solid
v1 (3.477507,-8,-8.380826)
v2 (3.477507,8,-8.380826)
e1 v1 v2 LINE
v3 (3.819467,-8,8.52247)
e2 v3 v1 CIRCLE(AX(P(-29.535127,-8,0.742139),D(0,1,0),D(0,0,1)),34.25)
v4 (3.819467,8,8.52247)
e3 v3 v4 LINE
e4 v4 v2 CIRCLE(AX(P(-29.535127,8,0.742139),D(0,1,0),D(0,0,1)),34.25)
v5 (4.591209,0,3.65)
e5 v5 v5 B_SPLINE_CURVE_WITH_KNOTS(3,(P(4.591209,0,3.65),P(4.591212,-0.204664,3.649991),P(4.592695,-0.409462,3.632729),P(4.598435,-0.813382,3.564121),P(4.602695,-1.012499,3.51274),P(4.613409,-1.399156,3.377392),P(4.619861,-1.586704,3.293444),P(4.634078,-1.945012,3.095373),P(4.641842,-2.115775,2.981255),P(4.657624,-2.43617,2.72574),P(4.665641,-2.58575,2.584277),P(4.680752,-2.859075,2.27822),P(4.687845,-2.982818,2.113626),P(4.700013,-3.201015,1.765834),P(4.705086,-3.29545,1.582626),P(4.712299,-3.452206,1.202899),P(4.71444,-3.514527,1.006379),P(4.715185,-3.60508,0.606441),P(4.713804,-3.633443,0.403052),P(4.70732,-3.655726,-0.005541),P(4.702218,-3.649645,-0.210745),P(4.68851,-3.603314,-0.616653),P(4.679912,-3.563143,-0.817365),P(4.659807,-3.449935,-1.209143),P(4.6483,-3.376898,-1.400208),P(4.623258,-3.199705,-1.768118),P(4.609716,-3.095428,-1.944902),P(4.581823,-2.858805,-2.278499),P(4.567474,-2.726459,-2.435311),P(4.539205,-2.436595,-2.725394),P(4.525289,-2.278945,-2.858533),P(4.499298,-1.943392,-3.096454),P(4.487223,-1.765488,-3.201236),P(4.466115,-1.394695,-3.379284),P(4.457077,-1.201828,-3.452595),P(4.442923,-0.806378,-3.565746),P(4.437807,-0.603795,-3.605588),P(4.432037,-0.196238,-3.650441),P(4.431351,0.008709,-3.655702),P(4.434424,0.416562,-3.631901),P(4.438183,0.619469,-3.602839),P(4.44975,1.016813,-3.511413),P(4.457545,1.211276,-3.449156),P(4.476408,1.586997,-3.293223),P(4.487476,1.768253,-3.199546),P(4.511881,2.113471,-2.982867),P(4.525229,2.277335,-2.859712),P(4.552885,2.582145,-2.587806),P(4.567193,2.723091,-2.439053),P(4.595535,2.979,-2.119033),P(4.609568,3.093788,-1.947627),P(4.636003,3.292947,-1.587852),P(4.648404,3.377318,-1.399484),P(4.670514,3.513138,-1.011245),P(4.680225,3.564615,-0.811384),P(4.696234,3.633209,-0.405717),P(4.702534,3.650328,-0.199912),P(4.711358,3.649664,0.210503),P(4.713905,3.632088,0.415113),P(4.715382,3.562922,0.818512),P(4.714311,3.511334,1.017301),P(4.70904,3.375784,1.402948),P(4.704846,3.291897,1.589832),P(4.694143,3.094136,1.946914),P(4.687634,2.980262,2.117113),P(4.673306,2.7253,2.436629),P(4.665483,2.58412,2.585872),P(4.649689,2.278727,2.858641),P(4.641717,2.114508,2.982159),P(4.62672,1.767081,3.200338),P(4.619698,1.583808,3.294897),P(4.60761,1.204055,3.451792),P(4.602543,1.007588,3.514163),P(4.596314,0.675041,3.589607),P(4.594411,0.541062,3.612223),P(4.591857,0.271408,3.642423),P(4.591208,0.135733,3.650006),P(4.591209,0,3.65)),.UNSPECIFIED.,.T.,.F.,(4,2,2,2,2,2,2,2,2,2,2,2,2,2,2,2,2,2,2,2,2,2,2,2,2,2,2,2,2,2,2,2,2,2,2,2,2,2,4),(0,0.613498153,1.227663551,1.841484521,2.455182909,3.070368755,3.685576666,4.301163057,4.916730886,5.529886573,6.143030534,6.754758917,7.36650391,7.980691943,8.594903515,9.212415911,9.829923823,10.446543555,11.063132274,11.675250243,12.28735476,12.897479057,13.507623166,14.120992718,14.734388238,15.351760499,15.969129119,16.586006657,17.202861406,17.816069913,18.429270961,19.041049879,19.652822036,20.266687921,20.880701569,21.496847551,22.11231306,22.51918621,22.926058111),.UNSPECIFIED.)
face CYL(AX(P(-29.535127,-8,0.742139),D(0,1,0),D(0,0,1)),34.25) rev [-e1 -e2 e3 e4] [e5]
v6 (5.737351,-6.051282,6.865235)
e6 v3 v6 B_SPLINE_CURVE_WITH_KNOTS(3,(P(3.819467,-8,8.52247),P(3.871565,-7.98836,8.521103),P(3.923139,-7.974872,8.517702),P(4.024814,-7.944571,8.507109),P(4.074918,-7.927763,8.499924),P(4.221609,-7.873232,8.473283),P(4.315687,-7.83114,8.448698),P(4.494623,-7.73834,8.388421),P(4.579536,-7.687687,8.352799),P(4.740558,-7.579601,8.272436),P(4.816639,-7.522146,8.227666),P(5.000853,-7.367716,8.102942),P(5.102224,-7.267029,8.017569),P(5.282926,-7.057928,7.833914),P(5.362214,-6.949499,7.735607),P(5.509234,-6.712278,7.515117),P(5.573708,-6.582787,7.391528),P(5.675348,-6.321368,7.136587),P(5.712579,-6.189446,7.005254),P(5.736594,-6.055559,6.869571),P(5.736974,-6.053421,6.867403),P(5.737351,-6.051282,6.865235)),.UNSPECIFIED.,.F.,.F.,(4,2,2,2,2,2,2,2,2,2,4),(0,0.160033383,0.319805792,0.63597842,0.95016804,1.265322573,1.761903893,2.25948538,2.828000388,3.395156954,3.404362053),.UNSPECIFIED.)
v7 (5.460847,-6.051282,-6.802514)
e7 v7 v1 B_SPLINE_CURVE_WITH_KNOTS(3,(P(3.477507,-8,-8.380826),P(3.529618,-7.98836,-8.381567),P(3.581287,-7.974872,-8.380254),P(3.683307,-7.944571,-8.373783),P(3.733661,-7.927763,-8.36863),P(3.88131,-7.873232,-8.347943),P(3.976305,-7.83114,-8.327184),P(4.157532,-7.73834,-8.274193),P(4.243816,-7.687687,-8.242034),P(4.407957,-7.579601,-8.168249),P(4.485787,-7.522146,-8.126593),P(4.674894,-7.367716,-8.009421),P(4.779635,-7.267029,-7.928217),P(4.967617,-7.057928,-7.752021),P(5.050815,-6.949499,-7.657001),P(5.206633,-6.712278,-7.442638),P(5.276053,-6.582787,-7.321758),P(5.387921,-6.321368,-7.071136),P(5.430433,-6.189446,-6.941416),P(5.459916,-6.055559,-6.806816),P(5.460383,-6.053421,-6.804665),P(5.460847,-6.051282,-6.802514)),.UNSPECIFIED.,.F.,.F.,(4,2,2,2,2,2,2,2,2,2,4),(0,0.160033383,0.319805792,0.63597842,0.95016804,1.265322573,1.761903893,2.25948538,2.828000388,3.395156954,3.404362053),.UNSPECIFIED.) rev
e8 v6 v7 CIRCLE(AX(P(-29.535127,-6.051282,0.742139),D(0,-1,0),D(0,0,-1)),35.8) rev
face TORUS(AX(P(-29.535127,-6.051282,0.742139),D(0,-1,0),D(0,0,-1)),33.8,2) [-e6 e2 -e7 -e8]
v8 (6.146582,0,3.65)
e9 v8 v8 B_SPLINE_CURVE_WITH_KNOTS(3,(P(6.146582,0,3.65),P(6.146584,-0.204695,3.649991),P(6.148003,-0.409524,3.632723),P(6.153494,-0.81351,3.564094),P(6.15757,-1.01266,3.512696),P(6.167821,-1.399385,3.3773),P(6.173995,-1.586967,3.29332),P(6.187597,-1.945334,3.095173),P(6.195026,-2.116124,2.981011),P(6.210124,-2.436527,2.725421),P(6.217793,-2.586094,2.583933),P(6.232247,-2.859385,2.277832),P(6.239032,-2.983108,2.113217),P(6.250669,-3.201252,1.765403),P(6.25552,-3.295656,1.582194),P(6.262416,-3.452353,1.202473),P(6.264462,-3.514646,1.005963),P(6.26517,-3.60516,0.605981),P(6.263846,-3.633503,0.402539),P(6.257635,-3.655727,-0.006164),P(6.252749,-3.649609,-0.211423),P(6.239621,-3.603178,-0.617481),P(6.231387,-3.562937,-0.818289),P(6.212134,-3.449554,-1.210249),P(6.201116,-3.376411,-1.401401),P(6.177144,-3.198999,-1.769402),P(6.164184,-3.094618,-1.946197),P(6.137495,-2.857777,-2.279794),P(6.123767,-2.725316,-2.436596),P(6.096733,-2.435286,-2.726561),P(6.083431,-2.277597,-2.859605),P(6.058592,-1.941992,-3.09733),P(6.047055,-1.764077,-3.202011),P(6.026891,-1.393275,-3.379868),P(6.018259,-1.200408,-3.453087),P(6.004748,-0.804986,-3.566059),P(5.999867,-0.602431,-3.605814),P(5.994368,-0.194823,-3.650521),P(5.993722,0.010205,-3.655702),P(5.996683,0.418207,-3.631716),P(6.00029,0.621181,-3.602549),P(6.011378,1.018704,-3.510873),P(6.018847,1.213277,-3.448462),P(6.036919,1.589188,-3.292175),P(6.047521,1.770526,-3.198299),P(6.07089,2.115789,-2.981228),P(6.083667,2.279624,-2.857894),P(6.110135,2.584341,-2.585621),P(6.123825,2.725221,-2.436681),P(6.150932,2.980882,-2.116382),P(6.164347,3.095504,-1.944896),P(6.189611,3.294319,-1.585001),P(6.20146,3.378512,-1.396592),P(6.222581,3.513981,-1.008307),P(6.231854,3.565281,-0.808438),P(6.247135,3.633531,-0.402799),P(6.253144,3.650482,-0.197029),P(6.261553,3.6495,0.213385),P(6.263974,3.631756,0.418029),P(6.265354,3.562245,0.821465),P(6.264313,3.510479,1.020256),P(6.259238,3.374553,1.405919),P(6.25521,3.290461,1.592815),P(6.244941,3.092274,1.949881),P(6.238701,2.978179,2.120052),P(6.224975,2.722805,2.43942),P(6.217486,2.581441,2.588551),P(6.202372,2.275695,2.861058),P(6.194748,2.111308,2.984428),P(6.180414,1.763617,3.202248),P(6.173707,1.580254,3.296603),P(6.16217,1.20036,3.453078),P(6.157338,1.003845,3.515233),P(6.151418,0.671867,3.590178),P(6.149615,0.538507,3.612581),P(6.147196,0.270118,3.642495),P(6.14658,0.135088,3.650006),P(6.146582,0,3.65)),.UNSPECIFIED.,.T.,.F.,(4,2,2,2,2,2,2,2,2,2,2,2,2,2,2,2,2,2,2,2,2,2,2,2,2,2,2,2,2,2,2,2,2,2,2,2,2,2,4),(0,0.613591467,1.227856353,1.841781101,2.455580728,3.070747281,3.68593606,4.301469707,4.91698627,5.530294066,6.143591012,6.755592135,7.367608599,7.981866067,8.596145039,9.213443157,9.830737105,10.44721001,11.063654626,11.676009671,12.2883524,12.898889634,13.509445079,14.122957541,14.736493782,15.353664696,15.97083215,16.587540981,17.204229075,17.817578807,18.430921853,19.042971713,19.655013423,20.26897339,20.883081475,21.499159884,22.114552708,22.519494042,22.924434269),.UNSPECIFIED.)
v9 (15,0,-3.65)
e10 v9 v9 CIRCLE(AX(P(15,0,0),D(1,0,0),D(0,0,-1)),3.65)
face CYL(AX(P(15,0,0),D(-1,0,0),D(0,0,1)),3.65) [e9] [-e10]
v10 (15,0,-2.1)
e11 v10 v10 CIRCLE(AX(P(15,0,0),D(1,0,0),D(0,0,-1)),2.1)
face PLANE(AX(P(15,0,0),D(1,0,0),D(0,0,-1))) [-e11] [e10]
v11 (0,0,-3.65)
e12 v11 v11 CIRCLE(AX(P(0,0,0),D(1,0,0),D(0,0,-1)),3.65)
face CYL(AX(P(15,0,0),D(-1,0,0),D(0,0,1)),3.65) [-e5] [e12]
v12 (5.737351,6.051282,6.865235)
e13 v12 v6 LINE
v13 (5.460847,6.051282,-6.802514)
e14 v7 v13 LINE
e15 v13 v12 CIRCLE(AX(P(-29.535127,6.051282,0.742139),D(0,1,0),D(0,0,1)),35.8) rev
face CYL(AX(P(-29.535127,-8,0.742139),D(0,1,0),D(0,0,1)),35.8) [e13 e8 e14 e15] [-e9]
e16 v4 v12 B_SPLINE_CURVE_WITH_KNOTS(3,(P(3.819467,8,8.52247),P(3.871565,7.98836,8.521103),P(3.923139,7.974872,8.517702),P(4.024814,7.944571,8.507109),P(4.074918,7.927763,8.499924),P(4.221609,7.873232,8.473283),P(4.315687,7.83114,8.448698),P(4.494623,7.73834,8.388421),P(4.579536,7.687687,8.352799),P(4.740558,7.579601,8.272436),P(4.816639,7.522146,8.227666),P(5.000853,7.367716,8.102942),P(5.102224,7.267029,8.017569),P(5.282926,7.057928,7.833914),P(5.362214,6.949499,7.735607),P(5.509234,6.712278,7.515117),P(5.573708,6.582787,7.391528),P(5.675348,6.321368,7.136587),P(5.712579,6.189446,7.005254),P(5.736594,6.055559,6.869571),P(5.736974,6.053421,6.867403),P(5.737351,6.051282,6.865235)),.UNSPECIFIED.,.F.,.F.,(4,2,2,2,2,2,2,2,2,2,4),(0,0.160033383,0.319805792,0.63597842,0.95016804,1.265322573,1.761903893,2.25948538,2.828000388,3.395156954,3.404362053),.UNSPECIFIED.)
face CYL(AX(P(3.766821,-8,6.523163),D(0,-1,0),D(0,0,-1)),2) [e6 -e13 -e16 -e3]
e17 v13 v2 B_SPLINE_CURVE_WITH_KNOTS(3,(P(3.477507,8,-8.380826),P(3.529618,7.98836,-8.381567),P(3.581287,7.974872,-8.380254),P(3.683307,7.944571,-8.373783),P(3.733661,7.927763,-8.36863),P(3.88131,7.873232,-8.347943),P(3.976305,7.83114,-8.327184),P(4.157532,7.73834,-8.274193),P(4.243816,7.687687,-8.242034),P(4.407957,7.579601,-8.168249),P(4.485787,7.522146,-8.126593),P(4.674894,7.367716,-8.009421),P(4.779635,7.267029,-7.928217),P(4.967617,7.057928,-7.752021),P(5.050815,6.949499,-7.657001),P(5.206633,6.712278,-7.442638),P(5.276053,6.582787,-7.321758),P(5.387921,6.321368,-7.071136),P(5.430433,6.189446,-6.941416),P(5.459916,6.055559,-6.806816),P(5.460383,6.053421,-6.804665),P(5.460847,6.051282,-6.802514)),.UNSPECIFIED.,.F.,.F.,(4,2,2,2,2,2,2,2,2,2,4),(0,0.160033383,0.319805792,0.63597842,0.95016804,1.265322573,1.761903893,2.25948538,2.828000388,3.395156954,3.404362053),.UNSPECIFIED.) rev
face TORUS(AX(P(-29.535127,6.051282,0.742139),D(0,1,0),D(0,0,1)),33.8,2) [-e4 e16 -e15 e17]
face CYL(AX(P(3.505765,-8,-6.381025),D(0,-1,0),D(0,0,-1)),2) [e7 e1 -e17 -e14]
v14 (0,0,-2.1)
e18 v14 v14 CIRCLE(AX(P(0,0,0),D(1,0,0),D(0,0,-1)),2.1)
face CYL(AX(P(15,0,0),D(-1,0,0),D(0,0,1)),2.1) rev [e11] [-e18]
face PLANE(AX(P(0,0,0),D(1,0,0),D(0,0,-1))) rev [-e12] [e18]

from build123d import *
from OCP.BRepAlgoAPI import BRepAlgoAPI_Cut
from OCP.TopTools import TopTools_ListOfShape

# Parameters (mm, degrees)
SKETCH3_R                = 3.65
SKETCH3_R_2              = 2.1
BOSS_EXTRUDE3_DEPTH      = 15
BOSS_EXTRUDE4_DEPTH      = 8
BOSS_EXTRUDE4_DEPTH_BACK = 8
SKETCH7_R                = 2.1
CUT_EXTRUDE1_DEPTH       = 18
FILLET2_START            = -8
FILLET2_DEPTH            = 16
FILLET2_2_ANGLE          = 28.578113
FILLET2_3_ANGLE          = 28.578113


with BuildPart() as part:
    # Sketch3 → Boss-Extrude3 (new body)
    with BuildSketch(Plane(origin=(0, 0, 0), x_dir=(0, 0, -1), z_dir=(1, 0, 0))):
        Circle(SKETCH3_R)
        Circle(SKETCH3_R_2, mode=Mode.SUBTRACT)
    extrude(amount=BOSS_EXTRUDE3_DEPTH)

    # Sketch6 → Boss-Extrude4 (add, two sides: drawn at the far end of the back side and taken through both)
    with BuildSketch(Plane(origin=(0, 0, 0), x_dir=(1, 0, 0), z_dir=(0, 1, 0)).offset(-BOSS_EXTRUDE4_DEPTH_BACK)):
        with BuildLine():
            Line((3.477507, 8.380826), (4.919958, 8.978308))
            ThreePointArc((4.919958, 8.978308), (6.258182, -0.050001), (5.26999, -9.123296))
            Line((5.26999, -9.123296), (3.819467, -8.52247))
            ThreePointArc((3.819467, -8.52247), (4.707866, -0.049391), (3.477507, 8.380826))
        make_face()
    extrude(amount=BOSS_EXTRUDE4_DEPTH + BOSS_EXTRUDE4_DEPTH_BACK)

    # Sketch7 → Cut-Extrude1 (cut)
    with BuildSketch(Plane.ZY):
        with Locations(Location((0, 0, 0), (0, 0, 180))):
            Circle(SKETCH7_R)
    extrude(amount=-CUT_EXTRUDE1_DEPTH, mode=Mode.SUBTRACT)


with BuildPart() as fillet2_tool:
    # Fillet2: read off the stored shape, not the designer's step
    # Fillet2 outline → Fillet2 (new body)
    with BuildSketch(Plane(origin=(0, 0, 0), x_dir=(1, 0, 0), z_dir=(0, 1, 0)).offset(FILLET2_START)):
        with BuildLine():
            ThreePointArc((5.26999, -9.123296), (5.521856, -7.99803), (5.737351, -6.865235))
            ThreePointArc((5.737351, -6.865235), (5.074459, -8.036465), (3.819467, -8.52247))
            Line((3.819467, -8.52247), (5.26999, -9.123296))
        make_face()
        with BuildLine():
            ThreePointArc((3.477507, 8.380826), (4.751128, 7.945976), (5.460847, 6.802514))
            ThreePointArc((5.460847, 6.802514), (5.20744, 7.894646), (4.919958, 8.978308))
            Line((4.919958, 8.978308), (3.477507, 8.380826))
        make_face()
    extrude(amount=FILLET2_DEPTH)


with BuildPart() as part_1:
    add(part.part)

    # Fillet2: cut by fillet2_tool, with a tolerance
    fillet2_stock = TopTools_ListOfShape()
    fillet2_stock.Append(part_1.part.wrapped)
    fillet2_tools = TopTools_ListOfShape()
    fillet2_tools.Append(fillet2_tool.part.wrapped)
    fillet2_cut = BRepAlgoAPI_Cut()
    fillet2_cut.SetArguments(fillet2_stock)
    fillet2_cut.SetTools(fillet2_tools)
    fillet2_cut.SetFuzzyValue(0.00001)
    fillet2_cut.Build()
    add(Compound.cast(fillet2_cut.Shape()).solids(), mode=Mode.REPLACE)


with BuildPart() as fillet2_2_tool:
    # Fillet2 2 outline → Fillet2 2 (revolve)
    with BuildSketch(Plane(origin=(-29.535127, 0, 0.742139), x_dir=(0.9738567621765157, 0, 0.22716295200378364), z_dir=(-0.22716295200378364, 0, 0.9738567621765157))):
        with BuildLine():
            Line((35.8, -8), (35.8, -6.051282))
            ThreePointArc((35.8, -6.051282), (35.365248, -7.296272), (34.25, -8))
            Line((34.25, -8), (35.8, -8))
        make_face()
    revolve(axis=Axis((-29.535127, 0, 0.742139), (0, 1, 0)), revolution_arc=FILLET2_2_ANGLE)


with BuildPart() as part_2:
    add(part_1.part)

    # Fillet2 2: cut by fillet2_2_tool, with a tolerance
    fillet2_2_stock = TopTools_ListOfShape()
    fillet2_2_stock.Append(part_2.part.wrapped)
    fillet2_2_tools = TopTools_ListOfShape()
    fillet2_2_tools.Append(fillet2_2_tool.part.wrapped)
    fillet2_2_cut = BRepAlgoAPI_Cut()
    fillet2_2_cut.SetArguments(fillet2_2_stock)
    fillet2_2_cut.SetTools(fillet2_2_tools)
    fillet2_2_cut.SetFuzzyValue(0.00001)
    fillet2_2_cut.Build()
    add(Compound.cast(fillet2_2_cut.Shape()).solids(), mode=Mode.REPLACE)


with BuildPart() as fillet2_3_tool:
    # Fillet2 3 outline → Fillet2 3 (revolve)
    with BuildSketch(Plane(origin=(-29.535127, 0, 0.742139), x_dir=(0.9738567621765157, 0, 0.22716295200378342), z_dir=(-0.22716295200378342, 0, 0.9738567621765157))):
        with BuildLine():
            ThreePointArc((34.25, 8), (35.365248, 7.296272), (35.8, 6.051282))
            Line((35.8, 6.051282), (35.8, 8))
            Line((35.8, 8), (34.25, 8))
        make_face()
    revolve(axis=Axis((-29.535127, 0, 0.742139), (0, 1, 0)), revolution_arc=FILLET2_3_ANGLE)


with BuildPart() as part_3:
    add(part_2.part)

    # Fillet2 3: cut by fillet2_3_tool, with a tolerance
    fillet2_3_stock = TopTools_ListOfShape()
    fillet2_3_stock.Append(part_3.part.wrapped)
    fillet2_3_tools = TopTools_ListOfShape()
    fillet2_3_tools.Append(fillet2_3_tool.part.wrapped)
    fillet2_3_cut = BRepAlgoAPI_Cut()
    fillet2_3_cut.SetArguments(fillet2_3_stock)
    fillet2_3_cut.SetTools(fillet2_3_tools)
    fillet2_3_cut.SetFuzzyValue(0.00001)
    fillet2_3_cut.Build()
    add(Compound.cast(fillet2_3_cut.Shape()).solids(), mode=Mode.REPLACE)


solid = part_3.part
